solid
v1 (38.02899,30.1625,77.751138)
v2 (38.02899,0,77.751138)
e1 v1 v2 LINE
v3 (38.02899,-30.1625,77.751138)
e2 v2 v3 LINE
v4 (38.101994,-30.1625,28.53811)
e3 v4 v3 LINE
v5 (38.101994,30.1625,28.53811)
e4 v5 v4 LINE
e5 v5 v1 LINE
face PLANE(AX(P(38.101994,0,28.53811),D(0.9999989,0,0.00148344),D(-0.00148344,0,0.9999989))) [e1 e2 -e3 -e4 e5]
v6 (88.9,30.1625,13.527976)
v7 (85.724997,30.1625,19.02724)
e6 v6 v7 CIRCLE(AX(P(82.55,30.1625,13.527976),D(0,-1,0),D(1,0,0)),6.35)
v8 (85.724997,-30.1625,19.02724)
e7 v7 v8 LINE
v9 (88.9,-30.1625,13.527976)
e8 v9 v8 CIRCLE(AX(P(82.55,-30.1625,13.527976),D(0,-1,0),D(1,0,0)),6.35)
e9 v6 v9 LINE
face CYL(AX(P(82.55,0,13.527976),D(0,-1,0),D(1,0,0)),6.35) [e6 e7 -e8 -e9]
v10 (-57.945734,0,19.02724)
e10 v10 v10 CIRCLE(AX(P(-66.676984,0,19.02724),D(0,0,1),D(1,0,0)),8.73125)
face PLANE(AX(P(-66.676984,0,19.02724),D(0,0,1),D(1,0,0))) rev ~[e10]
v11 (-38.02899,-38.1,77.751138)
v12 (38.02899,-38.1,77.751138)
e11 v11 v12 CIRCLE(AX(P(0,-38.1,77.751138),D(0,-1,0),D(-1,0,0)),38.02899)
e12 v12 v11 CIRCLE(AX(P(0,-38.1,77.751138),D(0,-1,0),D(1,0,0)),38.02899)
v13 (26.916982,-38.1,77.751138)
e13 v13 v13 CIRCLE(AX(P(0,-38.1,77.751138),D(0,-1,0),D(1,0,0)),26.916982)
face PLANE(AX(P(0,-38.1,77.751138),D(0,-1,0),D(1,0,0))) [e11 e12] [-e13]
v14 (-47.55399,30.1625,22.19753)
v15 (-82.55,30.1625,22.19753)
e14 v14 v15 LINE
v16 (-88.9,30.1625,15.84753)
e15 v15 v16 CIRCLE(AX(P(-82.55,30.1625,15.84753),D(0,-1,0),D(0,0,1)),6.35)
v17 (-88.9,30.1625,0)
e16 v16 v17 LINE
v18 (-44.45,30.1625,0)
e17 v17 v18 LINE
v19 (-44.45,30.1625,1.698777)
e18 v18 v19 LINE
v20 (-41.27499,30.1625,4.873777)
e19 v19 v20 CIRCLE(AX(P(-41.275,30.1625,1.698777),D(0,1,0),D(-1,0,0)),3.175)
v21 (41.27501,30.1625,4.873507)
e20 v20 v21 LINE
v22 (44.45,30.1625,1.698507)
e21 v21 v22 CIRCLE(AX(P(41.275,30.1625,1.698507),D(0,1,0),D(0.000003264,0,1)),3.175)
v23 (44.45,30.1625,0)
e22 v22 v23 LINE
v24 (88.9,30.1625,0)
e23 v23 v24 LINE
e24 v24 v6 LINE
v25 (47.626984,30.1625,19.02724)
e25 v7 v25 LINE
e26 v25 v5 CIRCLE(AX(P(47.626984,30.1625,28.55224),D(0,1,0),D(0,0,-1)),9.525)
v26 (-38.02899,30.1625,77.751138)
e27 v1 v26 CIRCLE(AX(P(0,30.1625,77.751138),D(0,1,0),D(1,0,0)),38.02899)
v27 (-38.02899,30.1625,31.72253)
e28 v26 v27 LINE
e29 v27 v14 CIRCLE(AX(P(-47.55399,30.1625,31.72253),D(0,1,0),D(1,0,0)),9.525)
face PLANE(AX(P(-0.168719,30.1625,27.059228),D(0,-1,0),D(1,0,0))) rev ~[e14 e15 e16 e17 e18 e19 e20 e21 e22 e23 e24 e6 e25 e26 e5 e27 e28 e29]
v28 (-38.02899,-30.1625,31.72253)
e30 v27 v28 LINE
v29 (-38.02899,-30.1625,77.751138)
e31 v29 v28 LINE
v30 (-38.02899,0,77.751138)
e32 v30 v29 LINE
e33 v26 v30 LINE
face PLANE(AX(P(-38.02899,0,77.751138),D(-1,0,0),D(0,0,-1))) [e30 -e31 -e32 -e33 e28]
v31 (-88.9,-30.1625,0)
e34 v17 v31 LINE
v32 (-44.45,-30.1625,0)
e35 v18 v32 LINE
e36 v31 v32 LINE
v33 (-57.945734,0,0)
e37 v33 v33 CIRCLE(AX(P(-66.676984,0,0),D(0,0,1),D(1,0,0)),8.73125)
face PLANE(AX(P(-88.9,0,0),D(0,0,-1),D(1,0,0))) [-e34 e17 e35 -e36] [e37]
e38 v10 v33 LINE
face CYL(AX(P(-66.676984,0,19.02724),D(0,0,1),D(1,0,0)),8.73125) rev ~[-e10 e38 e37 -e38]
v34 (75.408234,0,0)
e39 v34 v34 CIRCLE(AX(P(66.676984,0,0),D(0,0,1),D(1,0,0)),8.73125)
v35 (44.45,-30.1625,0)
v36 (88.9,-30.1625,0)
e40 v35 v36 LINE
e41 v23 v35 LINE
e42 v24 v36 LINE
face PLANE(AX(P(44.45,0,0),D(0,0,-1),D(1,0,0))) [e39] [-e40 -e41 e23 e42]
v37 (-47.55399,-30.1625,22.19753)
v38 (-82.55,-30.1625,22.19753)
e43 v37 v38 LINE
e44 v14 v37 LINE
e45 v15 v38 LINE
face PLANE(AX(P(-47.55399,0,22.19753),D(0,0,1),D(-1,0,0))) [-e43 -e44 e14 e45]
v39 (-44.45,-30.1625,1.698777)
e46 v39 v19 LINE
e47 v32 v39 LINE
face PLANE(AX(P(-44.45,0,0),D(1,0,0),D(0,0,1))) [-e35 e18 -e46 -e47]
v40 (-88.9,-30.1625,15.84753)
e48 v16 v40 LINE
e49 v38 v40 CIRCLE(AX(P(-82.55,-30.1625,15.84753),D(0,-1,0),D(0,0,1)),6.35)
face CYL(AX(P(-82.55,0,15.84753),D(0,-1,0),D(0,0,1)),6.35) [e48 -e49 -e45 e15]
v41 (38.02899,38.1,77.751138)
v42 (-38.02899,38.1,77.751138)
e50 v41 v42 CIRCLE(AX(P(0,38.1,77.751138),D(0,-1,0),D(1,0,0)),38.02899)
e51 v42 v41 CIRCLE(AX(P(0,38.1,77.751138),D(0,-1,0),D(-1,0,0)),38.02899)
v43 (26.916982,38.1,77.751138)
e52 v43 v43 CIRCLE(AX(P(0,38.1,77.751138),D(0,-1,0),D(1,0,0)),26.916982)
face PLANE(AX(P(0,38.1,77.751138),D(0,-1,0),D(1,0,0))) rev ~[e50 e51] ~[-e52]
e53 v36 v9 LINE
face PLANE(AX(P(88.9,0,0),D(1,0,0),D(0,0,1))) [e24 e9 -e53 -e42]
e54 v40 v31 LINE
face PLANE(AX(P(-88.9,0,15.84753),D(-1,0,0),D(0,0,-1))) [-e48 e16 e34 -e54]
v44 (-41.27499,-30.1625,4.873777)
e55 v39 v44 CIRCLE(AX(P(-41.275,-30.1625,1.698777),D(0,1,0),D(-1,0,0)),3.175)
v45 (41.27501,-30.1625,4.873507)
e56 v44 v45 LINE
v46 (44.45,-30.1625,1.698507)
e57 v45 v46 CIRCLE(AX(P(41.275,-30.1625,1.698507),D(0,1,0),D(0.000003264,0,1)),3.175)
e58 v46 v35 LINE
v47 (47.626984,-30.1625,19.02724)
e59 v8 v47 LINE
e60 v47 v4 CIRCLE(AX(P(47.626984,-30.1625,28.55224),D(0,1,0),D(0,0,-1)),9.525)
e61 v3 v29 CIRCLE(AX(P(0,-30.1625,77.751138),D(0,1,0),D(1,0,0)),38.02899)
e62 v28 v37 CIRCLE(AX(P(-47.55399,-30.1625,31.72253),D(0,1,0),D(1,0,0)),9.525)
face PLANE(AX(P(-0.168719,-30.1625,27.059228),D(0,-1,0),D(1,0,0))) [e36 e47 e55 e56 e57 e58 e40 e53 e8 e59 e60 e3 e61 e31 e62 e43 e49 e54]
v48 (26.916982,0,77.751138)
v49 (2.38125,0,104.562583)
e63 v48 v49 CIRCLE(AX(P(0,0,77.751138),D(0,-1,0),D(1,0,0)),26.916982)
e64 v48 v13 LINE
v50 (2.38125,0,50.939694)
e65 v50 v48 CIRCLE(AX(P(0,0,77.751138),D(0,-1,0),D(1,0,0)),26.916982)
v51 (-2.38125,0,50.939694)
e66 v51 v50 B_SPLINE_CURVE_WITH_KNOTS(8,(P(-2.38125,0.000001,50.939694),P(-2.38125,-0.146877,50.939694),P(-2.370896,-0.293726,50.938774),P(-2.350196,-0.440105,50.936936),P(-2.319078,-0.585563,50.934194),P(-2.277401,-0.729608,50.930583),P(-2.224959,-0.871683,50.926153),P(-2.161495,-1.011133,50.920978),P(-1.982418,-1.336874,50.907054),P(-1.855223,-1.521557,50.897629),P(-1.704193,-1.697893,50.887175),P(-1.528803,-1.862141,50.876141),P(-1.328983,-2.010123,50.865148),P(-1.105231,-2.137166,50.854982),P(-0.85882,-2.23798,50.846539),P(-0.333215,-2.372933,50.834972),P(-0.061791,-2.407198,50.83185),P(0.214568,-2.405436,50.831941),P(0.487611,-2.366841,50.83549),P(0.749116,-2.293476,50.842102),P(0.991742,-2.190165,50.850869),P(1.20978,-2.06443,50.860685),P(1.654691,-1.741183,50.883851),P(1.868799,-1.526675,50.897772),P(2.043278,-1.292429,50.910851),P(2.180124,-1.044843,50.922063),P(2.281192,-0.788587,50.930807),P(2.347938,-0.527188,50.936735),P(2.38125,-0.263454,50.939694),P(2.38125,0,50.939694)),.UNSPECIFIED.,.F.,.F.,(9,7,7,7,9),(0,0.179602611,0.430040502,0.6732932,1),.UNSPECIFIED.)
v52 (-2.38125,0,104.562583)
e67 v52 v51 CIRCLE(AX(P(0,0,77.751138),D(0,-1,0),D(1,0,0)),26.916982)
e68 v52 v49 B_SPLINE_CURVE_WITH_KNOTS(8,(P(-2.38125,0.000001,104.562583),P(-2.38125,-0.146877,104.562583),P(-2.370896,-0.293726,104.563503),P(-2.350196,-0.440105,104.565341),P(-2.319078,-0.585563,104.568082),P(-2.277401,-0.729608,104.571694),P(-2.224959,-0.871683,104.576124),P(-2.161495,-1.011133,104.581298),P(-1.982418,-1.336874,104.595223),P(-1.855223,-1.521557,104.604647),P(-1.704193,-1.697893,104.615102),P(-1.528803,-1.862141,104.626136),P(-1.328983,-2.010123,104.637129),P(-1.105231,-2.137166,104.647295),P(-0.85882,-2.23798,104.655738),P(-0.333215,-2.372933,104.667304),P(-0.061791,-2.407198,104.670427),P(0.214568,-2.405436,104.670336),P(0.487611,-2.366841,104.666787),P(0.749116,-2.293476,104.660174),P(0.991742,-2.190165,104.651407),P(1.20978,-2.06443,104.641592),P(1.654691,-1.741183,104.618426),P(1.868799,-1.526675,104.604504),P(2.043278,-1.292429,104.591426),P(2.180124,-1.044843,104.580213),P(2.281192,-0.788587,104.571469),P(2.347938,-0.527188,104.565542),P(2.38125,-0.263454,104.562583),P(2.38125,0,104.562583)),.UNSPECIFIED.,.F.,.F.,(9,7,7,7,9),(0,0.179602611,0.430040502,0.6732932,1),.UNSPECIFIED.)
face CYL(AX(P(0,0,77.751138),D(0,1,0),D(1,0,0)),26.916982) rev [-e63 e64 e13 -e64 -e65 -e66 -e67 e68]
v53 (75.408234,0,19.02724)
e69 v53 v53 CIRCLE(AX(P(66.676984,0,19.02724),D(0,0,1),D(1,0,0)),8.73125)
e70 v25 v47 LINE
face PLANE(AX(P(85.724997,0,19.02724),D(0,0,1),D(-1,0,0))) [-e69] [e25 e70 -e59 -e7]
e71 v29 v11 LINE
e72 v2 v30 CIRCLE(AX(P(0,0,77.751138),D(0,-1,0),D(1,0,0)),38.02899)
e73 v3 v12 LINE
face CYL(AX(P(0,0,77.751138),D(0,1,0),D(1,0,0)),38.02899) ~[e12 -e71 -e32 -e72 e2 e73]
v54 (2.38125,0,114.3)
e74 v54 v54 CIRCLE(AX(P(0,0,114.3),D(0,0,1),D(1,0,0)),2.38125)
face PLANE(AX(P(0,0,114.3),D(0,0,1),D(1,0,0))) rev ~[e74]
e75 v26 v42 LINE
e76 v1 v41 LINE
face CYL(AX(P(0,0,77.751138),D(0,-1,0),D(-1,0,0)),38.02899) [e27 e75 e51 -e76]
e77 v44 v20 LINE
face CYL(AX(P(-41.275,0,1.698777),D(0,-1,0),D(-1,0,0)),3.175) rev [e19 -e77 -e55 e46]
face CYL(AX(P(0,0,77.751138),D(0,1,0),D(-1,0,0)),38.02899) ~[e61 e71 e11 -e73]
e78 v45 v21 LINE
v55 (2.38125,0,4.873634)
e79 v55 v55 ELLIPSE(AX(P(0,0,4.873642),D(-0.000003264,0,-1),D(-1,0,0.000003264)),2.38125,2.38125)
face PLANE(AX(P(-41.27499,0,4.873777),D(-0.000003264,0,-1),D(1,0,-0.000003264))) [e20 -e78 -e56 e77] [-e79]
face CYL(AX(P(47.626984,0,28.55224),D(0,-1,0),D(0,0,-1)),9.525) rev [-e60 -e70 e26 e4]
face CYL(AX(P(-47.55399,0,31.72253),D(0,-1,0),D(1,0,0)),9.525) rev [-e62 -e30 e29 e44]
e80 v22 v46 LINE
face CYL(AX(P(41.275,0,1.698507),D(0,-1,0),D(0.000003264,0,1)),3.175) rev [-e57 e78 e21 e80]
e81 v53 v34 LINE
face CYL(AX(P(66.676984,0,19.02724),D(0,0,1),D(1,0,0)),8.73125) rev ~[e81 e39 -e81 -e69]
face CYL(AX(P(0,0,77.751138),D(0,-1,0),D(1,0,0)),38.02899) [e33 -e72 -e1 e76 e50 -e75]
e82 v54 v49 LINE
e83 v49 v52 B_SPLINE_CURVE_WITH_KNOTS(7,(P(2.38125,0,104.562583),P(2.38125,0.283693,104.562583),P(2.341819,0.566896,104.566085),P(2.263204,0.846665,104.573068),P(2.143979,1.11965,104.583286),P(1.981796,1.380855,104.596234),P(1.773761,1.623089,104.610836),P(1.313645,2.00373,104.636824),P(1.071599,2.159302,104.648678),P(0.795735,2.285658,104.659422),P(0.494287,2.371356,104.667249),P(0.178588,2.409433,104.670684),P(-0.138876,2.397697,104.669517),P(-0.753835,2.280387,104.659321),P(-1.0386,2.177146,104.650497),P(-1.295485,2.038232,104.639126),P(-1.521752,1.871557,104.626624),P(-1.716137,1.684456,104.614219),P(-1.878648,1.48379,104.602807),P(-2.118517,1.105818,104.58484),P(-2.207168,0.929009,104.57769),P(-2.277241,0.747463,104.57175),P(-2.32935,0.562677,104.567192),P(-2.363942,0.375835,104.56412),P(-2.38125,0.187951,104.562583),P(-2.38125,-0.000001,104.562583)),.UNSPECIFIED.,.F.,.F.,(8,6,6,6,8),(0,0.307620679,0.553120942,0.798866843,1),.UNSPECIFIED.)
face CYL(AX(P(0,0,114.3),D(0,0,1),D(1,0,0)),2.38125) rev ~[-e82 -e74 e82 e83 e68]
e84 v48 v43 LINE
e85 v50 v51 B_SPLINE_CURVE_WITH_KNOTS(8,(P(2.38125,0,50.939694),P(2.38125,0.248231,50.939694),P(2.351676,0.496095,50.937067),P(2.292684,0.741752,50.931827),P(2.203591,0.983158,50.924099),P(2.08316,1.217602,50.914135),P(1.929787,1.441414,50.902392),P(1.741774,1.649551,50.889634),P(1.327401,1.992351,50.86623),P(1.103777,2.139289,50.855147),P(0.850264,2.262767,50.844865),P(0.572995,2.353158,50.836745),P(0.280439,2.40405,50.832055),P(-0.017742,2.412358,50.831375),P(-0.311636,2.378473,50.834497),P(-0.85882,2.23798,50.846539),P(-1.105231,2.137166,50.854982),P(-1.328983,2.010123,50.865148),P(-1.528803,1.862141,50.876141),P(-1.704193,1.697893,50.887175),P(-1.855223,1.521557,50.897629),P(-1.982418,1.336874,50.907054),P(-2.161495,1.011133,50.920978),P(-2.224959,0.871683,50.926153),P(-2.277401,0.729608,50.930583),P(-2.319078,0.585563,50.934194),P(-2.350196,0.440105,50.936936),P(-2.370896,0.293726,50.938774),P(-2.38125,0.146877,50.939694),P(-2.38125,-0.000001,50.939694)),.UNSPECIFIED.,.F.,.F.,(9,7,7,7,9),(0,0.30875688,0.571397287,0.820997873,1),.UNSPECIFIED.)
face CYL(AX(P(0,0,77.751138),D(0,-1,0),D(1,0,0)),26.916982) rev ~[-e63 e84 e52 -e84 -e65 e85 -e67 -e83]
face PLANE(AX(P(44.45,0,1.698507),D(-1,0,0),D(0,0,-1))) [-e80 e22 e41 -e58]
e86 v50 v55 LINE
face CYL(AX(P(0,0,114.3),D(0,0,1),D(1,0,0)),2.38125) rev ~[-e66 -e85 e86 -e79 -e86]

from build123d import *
from build123d import SkipClean  # not in build123d's __all__

# Parameters (mm, degrees)
F1_DEPTH = 30.1625
F0_R     = 26.9169820067
F2_DEPTH = 38.1
F6_D     = 4.7625
F6_DEPTH = 114.301
F7_D     = 17.4625
F7_DEPTH = 19.0282397391


with BuildPart() as f1:
    # F0 (on Front) → F1 (new body, symmetric)
    with BuildSketch(Plane.XZ):
        with BuildLine():
            ThreePointArc((41.2750103626, 4.8735072878), (43.5200676937, 3.9435676542), (44.4499999995, 1.6985072878))
            Line((44.4499999995, 1.6985072878), (44.4499999995, 0))
            Line((44.4499999995, 0), (88.8999999995, 0))
            Line((88.8999999995, 0), (88.8999999995, 13.5279764081))
            ThreePointArc((88.8999999995, 13.5279764081), (88.0492603051, 16.7029781548), (85.7249965061, 19.0272397391))
            Line((85.7249965061, 19.0272397391), (47.6269838993, 19.0272397391))
            ThreePointArc((47.6269838993, 19.0272397391), (40.8967892902, 21.812053872), (38.1019943796, 28.5381099704))
            Line((38.1019943796, 28.5381099704), (38.0289897107, 77.7511383134))
            ThreePointArc((38.0289897107, 77.7511383134), (-2e-10, 39.7221486024), (-38.0289897112, 77.7511383134))
            Line((-38.0289897112, 77.7511383134), (-38.0289897112, 31.7225298162))
            ThreePointArc((-38.0289897112, 31.7225298162), (-40.8187976204, 24.9873377254), (-47.5539897112, 22.1975298162))
            Line((-47.5539897112, 22.1975298162), (-82.55, 22.1975298162))
            ThreePointArc((-82.55, 22.1975298162), (-87.0401280605, 20.3376578767), (-88.9, 15.8475298162))
            Line((-88.9, 15.8475298162), (-88.9, 0))
            Line((-88.9, 0), (-44.45, 0))
            Line((-44.45, 0), (-44.45, 1.6987767268))
            ThreePointArc((-44.45, 1.6987767268), (-43.5200603664, 3.943844421), (-41.274989637, 4.8737767268))
            Line((-41.274989637, 4.8737767268), (41.2750103626, 4.8735072878))
        make_face()
    extrude(amount=F1_DEPTH, both=True)

    # F0 (on Front) → F2 (join, symmetric)
    with BuildSketch(Plane.XZ):
        with BuildLine():
            ThreePointArc((-38.0289897112, 77.7511383134), (-2e-10, 39.7221486024), (38.0289897107, 77.7511383134))
            ThreePointArc((38.0289897107, 77.7511383134), (-2e-10, 115.7801280244), (-38.0289897112, 77.7511383134))
        make_face()
        with Locations((-2e-10, 77.7511383134)):
            Circle(F0_R, mode=Mode.SUBTRACT)
    with SkipClean():  # cleaning this boolean's faces spoils the solid; the shape is the same uncleaned
        extrude(amount=F2_DEPTH, both=True)

    # F6 (through all, one way)
    with BuildSketch(Plane.XY.offset(114.3)):
        with Locations((0, 0)):
            Circle(F6_D / 2)
    extrude(amount=-F6_DEPTH, mode=Mode.SUBTRACT)

    # F7 (through all, one way)
    with BuildSketch(Plane.XY.offset(19.0272397391)):
        with Locations((-66.6769838993, 0), (66.6769838993, 0)):
            Circle(F7_D / 2)
    extrude(amount=-F7_DEPTH, mode=Mode.SUBTRACT)


solid = f1.part
